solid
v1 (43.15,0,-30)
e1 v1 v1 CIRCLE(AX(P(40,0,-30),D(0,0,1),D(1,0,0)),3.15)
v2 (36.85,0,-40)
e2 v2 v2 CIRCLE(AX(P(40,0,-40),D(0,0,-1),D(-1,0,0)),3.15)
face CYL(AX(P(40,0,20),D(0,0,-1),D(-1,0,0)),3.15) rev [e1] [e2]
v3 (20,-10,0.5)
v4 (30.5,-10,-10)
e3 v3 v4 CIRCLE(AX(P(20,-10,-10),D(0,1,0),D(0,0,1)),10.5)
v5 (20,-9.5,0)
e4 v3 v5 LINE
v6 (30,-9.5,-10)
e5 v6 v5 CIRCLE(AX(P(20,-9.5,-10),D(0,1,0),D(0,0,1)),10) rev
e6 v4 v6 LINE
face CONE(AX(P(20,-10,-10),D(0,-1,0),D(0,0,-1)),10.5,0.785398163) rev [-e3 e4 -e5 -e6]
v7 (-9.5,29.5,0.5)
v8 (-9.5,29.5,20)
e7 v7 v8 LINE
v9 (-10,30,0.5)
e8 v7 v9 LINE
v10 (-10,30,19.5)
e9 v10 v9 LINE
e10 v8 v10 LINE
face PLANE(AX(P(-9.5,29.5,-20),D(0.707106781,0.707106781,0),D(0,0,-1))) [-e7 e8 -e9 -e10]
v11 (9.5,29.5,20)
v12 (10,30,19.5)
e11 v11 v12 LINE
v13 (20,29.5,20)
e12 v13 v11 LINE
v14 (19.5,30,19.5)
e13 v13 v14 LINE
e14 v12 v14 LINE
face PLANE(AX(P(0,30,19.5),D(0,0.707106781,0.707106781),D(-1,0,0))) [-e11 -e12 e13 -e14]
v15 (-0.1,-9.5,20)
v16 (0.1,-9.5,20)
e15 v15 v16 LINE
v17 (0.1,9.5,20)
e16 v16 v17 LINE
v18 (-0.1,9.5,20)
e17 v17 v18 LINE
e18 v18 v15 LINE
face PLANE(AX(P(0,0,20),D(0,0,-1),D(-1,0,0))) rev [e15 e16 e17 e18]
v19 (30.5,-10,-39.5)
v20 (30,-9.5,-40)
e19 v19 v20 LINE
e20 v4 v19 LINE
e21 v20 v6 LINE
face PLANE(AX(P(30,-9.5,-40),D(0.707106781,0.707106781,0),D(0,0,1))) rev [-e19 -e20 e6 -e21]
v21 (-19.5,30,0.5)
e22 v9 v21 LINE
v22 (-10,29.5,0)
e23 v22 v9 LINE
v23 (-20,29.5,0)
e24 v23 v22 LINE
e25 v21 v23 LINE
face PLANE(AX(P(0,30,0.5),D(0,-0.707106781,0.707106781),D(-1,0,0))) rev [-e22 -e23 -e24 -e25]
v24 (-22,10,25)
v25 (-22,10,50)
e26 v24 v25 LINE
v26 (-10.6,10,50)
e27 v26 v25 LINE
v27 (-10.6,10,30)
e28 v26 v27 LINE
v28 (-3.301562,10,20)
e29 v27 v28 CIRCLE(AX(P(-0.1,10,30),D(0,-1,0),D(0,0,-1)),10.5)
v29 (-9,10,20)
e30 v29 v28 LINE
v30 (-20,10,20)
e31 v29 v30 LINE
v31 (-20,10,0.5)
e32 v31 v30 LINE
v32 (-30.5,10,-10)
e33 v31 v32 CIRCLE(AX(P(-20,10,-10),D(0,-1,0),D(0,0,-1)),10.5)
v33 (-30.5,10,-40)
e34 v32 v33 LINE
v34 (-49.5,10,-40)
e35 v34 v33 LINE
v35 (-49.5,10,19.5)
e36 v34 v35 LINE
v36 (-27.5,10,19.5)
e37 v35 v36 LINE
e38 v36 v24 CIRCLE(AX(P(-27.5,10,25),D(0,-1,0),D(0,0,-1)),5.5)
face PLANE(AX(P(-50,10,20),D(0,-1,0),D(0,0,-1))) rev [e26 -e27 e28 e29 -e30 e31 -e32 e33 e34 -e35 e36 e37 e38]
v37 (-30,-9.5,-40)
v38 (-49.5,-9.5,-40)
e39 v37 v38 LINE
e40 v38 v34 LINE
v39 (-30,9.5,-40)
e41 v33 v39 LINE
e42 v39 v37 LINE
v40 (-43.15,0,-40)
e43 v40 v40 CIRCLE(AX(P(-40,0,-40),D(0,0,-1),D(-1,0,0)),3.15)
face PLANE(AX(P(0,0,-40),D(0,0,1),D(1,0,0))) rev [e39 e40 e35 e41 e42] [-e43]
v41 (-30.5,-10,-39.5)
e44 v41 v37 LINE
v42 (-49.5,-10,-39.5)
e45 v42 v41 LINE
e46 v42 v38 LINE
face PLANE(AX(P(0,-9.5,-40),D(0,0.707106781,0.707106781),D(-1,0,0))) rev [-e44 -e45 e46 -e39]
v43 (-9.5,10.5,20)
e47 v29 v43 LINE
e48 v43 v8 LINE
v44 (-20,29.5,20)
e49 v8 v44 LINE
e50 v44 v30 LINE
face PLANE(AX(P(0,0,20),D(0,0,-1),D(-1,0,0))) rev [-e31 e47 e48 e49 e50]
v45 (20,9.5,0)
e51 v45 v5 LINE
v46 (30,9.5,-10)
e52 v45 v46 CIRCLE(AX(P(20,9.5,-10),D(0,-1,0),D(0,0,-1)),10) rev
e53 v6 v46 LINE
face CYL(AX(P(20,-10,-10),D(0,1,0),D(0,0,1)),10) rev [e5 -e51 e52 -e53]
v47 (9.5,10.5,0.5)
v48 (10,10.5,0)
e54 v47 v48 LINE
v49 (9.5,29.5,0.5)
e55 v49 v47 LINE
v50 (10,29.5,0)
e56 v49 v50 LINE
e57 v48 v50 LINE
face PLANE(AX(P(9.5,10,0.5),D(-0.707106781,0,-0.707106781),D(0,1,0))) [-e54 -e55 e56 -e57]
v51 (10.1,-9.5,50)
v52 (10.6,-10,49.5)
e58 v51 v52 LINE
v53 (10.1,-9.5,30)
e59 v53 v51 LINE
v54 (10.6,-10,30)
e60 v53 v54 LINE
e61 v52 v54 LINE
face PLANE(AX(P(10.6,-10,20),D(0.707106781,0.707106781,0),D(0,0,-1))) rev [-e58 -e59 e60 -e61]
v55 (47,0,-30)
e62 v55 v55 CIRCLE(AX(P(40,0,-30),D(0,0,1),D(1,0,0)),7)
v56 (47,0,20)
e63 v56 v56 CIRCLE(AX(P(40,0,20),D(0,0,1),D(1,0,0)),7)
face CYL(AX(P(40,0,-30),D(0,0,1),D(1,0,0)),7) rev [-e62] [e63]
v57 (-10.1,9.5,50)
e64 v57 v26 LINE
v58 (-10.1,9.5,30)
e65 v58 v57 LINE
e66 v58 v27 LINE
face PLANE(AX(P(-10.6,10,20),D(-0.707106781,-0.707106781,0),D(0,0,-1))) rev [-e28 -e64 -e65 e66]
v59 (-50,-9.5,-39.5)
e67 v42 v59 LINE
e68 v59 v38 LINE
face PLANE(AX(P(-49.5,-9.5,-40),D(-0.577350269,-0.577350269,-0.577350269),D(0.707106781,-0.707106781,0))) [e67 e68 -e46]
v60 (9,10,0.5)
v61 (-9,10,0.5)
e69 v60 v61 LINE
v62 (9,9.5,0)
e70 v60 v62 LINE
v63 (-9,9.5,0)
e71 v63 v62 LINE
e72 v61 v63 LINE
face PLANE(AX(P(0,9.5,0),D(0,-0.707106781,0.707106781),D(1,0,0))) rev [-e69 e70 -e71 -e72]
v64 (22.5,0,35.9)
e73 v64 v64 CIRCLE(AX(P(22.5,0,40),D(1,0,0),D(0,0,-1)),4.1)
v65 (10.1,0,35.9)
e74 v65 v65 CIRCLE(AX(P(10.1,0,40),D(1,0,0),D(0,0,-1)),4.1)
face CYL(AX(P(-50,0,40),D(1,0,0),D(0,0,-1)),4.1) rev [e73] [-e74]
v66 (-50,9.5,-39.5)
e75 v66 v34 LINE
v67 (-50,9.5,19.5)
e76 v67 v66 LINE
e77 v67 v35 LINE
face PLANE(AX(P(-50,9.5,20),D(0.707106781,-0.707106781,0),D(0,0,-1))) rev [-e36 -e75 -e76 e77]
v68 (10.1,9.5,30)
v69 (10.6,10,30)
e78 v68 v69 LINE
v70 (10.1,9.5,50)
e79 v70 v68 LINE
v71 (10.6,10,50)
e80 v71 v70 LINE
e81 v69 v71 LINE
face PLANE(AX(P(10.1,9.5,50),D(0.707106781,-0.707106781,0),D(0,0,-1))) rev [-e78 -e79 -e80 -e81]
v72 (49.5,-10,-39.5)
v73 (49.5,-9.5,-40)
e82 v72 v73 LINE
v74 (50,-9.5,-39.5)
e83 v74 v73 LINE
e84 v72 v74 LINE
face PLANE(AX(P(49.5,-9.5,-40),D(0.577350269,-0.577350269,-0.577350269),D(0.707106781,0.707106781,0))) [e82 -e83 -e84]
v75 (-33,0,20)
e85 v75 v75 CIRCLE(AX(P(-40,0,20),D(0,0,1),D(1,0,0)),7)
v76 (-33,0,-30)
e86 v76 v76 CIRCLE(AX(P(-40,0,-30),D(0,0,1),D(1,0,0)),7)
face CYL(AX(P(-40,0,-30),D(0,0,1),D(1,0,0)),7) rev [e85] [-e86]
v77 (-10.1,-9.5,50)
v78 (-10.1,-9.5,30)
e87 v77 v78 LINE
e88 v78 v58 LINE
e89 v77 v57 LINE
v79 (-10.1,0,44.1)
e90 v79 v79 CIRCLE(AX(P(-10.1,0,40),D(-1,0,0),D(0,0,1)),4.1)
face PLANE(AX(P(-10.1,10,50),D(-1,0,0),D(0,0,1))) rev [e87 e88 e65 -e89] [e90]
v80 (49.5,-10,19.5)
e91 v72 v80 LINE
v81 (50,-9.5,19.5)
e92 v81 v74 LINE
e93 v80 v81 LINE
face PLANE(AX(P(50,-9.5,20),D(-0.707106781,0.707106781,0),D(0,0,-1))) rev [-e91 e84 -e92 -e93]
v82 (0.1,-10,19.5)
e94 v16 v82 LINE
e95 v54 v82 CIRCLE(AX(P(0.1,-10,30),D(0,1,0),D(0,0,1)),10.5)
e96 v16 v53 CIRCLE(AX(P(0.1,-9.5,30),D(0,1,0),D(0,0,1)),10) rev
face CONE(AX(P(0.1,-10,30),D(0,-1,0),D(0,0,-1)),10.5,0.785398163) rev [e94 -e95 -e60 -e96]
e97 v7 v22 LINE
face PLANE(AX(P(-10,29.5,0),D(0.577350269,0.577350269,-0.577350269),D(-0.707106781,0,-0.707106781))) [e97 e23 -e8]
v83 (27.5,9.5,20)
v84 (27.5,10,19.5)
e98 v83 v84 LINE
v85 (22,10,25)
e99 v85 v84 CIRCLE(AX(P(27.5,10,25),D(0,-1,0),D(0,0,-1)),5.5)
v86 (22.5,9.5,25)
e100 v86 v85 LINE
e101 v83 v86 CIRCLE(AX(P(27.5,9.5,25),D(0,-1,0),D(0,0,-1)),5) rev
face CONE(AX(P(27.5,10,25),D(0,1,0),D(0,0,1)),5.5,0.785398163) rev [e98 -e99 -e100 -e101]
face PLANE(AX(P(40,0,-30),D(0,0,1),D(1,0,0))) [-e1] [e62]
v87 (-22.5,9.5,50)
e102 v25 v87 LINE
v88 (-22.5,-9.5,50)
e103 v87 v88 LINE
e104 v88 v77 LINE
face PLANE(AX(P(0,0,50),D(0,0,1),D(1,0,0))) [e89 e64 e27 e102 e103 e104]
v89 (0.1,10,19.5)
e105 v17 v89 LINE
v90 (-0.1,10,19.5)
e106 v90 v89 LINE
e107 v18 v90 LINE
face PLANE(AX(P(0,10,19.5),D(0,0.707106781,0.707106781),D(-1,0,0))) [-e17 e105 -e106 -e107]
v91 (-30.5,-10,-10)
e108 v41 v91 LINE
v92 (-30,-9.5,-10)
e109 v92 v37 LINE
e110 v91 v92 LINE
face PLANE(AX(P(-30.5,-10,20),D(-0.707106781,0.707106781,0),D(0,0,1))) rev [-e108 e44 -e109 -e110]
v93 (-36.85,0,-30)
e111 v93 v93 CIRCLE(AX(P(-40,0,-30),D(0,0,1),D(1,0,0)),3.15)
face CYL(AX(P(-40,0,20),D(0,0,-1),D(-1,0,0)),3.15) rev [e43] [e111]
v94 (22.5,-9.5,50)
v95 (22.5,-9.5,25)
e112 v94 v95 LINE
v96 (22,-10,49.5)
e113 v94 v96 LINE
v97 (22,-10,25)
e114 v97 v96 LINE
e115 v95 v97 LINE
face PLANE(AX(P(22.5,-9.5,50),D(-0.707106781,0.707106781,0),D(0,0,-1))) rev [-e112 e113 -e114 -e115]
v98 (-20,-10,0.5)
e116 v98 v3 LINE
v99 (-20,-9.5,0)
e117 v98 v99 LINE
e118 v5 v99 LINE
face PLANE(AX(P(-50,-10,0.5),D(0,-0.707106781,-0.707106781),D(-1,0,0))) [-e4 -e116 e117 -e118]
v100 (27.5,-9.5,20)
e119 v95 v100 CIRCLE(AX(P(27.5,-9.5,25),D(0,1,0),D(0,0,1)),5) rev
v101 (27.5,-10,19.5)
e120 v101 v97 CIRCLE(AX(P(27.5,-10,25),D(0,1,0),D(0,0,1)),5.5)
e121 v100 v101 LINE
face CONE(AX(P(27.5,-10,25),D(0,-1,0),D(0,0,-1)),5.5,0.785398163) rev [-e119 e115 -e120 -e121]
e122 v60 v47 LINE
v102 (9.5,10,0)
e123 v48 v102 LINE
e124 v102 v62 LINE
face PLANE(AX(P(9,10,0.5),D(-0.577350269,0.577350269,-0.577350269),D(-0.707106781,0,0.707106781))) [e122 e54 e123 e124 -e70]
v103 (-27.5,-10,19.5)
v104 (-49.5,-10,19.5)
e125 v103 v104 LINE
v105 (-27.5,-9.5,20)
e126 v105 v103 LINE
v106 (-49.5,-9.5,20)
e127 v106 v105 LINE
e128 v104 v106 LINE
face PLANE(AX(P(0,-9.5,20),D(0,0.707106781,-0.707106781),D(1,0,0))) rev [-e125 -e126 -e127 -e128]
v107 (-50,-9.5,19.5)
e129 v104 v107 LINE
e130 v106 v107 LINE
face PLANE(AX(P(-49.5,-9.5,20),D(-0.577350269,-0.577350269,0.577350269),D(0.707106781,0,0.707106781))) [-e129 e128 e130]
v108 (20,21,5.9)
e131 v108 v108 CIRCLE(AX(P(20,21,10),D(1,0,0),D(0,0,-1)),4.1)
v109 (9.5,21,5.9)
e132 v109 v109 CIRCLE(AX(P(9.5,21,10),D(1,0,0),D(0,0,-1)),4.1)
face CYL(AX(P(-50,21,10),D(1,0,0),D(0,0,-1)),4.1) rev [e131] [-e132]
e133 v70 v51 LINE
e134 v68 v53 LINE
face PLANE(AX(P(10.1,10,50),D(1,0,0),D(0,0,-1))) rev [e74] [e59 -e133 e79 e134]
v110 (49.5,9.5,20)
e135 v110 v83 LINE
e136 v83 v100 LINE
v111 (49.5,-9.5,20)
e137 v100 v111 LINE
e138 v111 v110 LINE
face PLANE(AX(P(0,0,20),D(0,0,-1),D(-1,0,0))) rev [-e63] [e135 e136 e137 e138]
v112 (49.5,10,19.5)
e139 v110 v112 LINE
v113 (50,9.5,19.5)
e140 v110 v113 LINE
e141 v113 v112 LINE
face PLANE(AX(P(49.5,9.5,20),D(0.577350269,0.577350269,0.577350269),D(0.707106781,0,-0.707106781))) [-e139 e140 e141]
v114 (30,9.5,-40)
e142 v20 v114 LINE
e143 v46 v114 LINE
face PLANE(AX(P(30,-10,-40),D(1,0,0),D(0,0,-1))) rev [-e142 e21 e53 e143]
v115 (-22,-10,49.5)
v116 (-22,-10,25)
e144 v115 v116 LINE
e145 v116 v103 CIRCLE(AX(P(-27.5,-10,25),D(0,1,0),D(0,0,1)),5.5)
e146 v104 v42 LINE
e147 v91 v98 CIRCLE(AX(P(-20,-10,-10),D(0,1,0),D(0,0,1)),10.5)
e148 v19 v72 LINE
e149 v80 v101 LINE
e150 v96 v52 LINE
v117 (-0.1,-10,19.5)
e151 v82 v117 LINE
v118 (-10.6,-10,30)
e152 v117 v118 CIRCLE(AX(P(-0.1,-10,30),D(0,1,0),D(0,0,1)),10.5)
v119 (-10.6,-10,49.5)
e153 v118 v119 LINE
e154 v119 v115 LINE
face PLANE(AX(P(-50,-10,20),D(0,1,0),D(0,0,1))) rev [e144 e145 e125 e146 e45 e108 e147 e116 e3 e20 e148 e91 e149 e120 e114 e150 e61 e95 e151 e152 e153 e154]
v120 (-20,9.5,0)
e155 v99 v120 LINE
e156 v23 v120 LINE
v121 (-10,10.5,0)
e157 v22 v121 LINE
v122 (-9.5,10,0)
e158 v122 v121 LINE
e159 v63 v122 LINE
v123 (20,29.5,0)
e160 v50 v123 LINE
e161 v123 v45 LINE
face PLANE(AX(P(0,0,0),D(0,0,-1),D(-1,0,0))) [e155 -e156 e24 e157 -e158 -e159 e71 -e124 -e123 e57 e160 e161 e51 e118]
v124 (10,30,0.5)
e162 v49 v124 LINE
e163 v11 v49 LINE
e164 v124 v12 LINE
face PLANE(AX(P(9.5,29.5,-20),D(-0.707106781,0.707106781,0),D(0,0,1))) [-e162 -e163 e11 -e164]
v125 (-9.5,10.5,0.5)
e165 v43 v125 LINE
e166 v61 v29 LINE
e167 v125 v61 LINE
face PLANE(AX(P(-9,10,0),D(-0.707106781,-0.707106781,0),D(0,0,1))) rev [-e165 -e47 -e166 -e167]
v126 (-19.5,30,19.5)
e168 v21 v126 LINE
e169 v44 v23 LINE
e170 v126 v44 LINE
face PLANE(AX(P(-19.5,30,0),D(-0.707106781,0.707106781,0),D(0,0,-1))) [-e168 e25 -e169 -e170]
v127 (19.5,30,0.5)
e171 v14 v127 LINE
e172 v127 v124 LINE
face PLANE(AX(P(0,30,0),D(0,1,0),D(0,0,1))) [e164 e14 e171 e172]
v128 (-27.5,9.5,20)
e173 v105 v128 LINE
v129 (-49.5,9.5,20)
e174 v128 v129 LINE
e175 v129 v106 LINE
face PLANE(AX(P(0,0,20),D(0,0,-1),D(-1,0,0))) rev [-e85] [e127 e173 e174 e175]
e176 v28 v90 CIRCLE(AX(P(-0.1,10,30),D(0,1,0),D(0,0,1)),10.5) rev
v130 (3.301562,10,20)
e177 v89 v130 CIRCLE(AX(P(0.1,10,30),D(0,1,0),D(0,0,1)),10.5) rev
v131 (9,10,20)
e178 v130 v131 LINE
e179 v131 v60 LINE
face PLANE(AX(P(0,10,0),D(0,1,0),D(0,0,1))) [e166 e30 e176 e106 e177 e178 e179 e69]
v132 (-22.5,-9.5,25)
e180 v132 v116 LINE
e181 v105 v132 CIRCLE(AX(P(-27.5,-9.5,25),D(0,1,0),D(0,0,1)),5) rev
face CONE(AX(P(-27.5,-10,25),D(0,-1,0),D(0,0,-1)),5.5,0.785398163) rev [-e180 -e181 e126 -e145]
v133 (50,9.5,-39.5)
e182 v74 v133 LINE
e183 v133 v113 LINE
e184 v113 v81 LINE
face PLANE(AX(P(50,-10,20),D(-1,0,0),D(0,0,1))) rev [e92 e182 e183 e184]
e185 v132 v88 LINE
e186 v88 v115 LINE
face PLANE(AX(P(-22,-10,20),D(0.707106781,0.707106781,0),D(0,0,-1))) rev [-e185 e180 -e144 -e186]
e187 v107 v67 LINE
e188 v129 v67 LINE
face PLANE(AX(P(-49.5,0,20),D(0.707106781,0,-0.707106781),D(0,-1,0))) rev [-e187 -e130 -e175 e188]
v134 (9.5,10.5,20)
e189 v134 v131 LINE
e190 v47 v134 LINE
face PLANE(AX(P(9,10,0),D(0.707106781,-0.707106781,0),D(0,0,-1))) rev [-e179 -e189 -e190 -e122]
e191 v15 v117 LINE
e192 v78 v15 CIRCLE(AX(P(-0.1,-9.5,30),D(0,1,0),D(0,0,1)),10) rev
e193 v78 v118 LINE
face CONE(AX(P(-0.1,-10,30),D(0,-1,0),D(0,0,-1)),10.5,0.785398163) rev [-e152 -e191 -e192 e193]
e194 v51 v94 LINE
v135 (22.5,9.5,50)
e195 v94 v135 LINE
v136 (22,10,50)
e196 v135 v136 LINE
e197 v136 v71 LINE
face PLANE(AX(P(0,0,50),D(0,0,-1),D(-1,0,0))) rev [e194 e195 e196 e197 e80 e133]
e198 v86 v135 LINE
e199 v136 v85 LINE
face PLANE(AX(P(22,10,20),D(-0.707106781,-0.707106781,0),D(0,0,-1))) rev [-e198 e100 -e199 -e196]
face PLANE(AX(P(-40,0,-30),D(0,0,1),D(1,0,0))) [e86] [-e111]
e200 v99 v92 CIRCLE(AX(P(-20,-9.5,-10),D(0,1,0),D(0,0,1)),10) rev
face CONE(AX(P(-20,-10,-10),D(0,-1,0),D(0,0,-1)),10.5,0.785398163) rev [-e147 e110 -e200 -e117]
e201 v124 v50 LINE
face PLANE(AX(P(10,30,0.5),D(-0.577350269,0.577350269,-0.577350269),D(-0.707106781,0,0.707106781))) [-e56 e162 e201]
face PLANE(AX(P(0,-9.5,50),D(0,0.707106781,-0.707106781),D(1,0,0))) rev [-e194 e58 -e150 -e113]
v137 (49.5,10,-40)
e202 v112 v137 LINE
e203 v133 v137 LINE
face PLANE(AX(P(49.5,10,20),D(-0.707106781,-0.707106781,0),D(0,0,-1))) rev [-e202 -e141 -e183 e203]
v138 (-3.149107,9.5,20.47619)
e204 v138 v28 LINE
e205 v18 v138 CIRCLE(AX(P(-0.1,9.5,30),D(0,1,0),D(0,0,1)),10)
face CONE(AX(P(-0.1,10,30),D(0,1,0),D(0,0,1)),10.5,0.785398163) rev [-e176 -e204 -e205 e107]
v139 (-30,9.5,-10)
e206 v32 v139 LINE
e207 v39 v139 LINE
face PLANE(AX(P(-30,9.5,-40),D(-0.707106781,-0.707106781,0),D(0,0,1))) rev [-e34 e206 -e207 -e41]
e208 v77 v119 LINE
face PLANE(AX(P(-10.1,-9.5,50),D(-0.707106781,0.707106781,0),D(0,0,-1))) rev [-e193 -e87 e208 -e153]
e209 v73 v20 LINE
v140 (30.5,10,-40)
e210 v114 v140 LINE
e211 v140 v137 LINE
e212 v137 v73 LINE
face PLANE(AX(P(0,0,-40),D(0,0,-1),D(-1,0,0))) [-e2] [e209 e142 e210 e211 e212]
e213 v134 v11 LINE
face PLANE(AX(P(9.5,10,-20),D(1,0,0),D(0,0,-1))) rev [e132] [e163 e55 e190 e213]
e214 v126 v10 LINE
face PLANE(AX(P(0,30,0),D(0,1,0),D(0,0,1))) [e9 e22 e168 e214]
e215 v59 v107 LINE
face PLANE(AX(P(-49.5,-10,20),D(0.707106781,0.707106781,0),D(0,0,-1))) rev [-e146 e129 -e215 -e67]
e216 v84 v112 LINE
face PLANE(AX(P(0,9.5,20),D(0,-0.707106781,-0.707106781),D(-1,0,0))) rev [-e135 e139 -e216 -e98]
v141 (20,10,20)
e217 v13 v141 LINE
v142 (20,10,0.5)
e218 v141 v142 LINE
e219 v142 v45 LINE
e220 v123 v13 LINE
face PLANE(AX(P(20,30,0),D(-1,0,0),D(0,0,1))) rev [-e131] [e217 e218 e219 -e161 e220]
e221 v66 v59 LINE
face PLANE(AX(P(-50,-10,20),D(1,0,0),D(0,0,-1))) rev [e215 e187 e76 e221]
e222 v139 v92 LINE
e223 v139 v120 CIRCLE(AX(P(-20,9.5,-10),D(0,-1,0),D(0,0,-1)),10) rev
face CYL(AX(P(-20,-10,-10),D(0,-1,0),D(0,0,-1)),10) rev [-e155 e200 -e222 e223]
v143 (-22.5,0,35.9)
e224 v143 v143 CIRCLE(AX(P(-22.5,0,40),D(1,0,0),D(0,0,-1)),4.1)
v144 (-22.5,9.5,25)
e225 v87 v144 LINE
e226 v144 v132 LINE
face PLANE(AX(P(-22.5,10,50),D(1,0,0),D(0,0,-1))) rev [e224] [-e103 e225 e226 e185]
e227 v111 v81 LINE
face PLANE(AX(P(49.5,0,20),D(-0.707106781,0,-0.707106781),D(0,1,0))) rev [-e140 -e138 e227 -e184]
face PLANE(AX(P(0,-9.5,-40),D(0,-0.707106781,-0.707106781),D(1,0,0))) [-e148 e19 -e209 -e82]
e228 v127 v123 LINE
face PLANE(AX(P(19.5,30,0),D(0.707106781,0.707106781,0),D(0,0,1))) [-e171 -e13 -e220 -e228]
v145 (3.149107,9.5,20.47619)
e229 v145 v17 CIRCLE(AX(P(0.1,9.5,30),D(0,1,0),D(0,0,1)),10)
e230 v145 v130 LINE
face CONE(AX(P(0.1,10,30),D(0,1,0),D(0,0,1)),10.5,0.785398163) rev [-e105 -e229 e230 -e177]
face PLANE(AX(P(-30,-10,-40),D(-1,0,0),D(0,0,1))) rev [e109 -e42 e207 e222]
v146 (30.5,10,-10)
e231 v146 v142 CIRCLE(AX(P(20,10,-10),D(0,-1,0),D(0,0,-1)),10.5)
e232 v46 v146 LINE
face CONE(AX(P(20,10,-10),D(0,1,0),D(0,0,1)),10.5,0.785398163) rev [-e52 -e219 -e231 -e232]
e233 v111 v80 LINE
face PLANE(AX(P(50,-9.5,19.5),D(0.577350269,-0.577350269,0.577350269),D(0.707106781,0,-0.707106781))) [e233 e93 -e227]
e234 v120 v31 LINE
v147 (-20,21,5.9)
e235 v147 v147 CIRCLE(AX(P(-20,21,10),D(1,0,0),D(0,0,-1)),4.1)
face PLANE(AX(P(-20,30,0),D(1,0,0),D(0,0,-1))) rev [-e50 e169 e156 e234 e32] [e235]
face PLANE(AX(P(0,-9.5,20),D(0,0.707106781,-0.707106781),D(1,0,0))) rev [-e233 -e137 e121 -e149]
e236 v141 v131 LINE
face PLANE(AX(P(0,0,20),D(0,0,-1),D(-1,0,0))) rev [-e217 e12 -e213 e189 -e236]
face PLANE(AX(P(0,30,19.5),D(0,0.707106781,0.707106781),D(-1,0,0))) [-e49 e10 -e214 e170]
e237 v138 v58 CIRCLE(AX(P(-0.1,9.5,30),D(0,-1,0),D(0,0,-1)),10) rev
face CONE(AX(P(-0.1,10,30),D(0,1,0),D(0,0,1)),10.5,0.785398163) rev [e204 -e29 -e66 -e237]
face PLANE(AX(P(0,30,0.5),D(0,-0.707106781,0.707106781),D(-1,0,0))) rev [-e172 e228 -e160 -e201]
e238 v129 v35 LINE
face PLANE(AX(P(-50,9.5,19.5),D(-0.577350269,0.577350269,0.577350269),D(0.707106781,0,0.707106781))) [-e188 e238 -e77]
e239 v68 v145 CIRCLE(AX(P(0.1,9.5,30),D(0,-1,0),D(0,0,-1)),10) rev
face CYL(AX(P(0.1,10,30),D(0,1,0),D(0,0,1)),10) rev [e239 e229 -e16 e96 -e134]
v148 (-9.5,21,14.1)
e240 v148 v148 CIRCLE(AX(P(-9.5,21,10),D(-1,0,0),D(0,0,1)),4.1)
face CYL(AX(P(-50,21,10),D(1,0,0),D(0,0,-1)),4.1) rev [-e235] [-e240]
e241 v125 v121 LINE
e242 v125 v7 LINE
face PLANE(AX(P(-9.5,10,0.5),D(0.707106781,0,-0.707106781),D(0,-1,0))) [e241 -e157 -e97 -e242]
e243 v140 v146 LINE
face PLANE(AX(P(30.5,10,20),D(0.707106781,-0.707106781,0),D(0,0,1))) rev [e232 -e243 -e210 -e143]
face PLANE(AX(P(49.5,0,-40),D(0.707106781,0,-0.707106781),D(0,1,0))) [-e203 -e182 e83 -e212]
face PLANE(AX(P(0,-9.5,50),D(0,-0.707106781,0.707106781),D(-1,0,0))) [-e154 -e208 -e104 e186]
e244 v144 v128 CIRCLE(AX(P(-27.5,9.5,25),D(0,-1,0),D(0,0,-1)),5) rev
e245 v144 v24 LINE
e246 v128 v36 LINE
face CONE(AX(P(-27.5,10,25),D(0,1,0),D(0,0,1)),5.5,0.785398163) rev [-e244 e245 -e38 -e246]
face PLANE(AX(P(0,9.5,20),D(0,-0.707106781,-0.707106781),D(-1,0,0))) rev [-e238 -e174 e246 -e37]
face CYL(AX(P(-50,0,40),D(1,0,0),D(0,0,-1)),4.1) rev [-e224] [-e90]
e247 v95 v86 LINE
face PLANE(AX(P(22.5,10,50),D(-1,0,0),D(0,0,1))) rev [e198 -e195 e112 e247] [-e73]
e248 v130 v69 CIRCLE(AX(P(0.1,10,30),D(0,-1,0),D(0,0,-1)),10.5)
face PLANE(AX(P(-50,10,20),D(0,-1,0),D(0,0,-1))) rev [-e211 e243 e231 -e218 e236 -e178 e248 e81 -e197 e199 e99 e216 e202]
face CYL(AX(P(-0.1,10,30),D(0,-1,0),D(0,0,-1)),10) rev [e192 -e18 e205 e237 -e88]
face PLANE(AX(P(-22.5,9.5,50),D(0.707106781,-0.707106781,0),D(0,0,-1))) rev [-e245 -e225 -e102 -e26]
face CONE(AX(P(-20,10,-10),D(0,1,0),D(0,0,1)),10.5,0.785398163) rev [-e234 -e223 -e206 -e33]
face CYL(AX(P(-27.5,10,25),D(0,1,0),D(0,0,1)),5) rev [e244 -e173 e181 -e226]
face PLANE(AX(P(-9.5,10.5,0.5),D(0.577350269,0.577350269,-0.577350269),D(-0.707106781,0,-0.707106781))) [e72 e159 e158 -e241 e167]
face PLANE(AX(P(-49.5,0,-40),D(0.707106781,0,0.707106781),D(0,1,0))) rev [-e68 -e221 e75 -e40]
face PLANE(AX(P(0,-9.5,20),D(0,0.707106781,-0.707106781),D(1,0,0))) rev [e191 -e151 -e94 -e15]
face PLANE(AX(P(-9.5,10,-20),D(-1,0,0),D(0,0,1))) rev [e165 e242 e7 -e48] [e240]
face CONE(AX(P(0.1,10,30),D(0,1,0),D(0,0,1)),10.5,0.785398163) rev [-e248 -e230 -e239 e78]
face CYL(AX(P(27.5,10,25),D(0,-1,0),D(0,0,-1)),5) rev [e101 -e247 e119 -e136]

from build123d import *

# Parameters (mm, degrees)
SKETCH1_W           = 100
SKETCH1_H           = 20
SKETCH1_R           = 3.15
BOSS_EXTRUDE1_DEPTH = 20
SKETCH8_W           = 40
SKETCH8_H           = 20
BOSS_EXTRUDE2_DEPTH = 20
SKETCH9_W           = 19
SKETCH9_H           = 40
CUT_EXTRUDE5_DEPTH  = 20
SKETCH10_R          = 4.1
CUT_EXTRUDE6_DEPTH  = 79.74007874
SKETCH11_W          = 12.4
SKETCH11_H          = 20
BOSS_EXTRUDE3_DEPTH = 30
FILLET1_R           = 10
FILLET2_R           = 5
SKETCH12_R          = 4.1
CUT_EXTRUDE7_DEPTH  = 94.03897033
BOSS_EXTRUDE4_START = 40
SKETCH13_W          = 20
SKETCH13_H          = 20
SKETCH13_R          = 3.15
BOSS_EXTRUDE4_DEPTH = 40
FILLET3_R           = 10
CHAMFER1_SIZE       = 0.5
SKETCH5_R           = 7
CUT_EXTRUDE3_DEPTH  = 50


with BuildPart() as part:
    # Sketch1 → Boss-Extrude1 (new body)
    with BuildSketch(Plane.XY):
        Rectangle(SKETCH1_W, SKETCH1_H)
        with Locations((-40, 0)):
            Circle(SKETCH1_R, mode=Mode.SUBTRACT)
        with Locations((40, 0)):
            Circle(SKETCH1_R, mode=Mode.SUBTRACT)
    extrude(amount=BOSS_EXTRUDE1_DEPTH)

    # Sketch8 → Boss-Extrude2 (add)
    with BuildSketch(Plane(origin=(0, 10, 0), x_dir=(1, 0, 0), z_dir=(0, 1, 0))):
        with Locations((0, -10)):
            Rectangle(SKETCH8_W, SKETCH8_H)
    extrude(amount=BOSS_EXTRUDE2_DEPTH)

    # Sketch9 → Cut-Extrude5 (cut)
    with BuildSketch(Plane(origin=(0, 30, 0), x_dir=(1, 0, 0), z_dir=(0, 1, 0))):
        Rectangle(SKETCH9_W, SKETCH9_H)
    extrude(amount=-CUT_EXTRUDE5_DEPTH, mode=Mode.SUBTRACT)

    # Sketch10 → Cut-Extrude6 (cut, through all)
    with BuildSketch(Plane(origin=(20, 0, 0), x_dir=(0, 0, -1), z_dir=(1, 0, 0))):
        with Locations((-10, 21)):
            Circle(SKETCH10_R)
    extrude(amount=-CUT_EXTRUDE6_DEPTH, mode=Mode.SUBTRACT)

    # Sketch11 → Boss-Extrude3 (add)
    with BuildSketch(Plane.XY.offset(20)):
        with Locations((-16.3, 0)):
            Rectangle(SKETCH11_W, SKETCH11_H)
        with Locations((16.3, 0)):
            Rectangle(SKETCH11_W, SKETCH11_H)
    extrude(amount=BOSS_EXTRUDE3_DEPTH)

    # Fillet1
    # the kernel refuses this fillet: 10 mm, written as the material it adds along each edge
    with BuildSketch(Plane(origin=(-10.1, 10, 20), x_dir=(1, 0, 0), z_dir=(0, -1, 0))) as fillet1_piece_1:
        with BuildLine():
            CenterArc((FILLET1_R, FILLET1_R), FILLET1_R, 180, 90)
            Line((0, FILLET1_R), (0, 0))
            Line((0, 0), (FILLET1_R, 0))
        make_face()
    extrude(amount=20)
    with BuildSketch(Plane(origin=(10.1, 10, 20), x_dir=(-1, 0, 0), z_dir=(0, -1, 0))) as fillet1_piece_2:
        with BuildLine():
            CenterArc((FILLET1_R, -FILLET1_R), FILLET1_R, 90, 90)
            Line((0, -FILLET1_R), (0, 0))
            Line((0, 0), (FILLET1_R, 0))
        make_face()
    extrude(amount=20)

    # Fillet2
    fillet2_edges = [part.edges().sort_by_distance(p)[0] for p in [
        (-22.5, 0, 20),
        (22.5, 0, 20),
    ]]
    fillet(fillet2_edges, radius=FILLET2_R)

    # Sketch12 → Cut-Extrude7 (cut, through all)
    with BuildSketch(Plane(origin=(22.5, 0, 0), x_dir=(0, 0, -1), z_dir=(1, 0, 0))):
        with Locations((-40, 0)):
            Circle(SKETCH12_R)
    extrude(amount=-CUT_EXTRUDE7_DEPTH, mode=Mode.SUBTRACT)

    # Sketch13 → Boss-Extrude4 (add)
    # profile 1 of 2: a face of its own
    with BuildSketch(Plane(origin=(0, 0, 0), x_dir=(-1, 0, 0), z_dir=(0, 0, -1)).offset(BOSS_EXTRUDE4_START)):
        with Locations((-40, 0)):
            Rectangle(SKETCH13_W, SKETCH13_H)
        with Locations((-40, 0)):
            Circle(SKETCH13_R, mode=Mode.SUBTRACT)
    # profile 2 of 2: a face of its own
    with BuildSketch(Plane(origin=(0, 0, 0), x_dir=(-1, 0, 0), z_dir=(0, 0, -1)).offset(BOSS_EXTRUDE4_START)):
        with Locations((40, 0)):
            Rectangle(SKETCH13_W, SKETCH13_H)
        with Locations((40, 0)):
            Circle(SKETCH13_R, mode=Mode.SUBTRACT)
    extrude(amount=-BOSS_EXTRUDE4_DEPTH)

    # Fillet3
    fillet3_edges = [part.edges().sort_by_distance(p)[0] for p in [
        (-30, 0, 0),
        (30, 0, 0),
    ]]
    fillet(fillet3_edges, radius=FILLET3_R)

    # Chamfer1
    chamfer1_edges = [part.edges().sort_by_distance(p)[0] for p in [
        (-7.171067812, -10, 22.928932188),
        (-50, 0, 20),
        (-38.75, 10, 20),
        (38.75, -10, 20),
        (-23.964466094, -10, 21.464466094),
        (-23.964466094, 10, 21.464466094),
        (23.964466094, 10, 21.464466094),
        (23.964466094, -10, 21.464466094),
        (50, 0, -40),
        (40, -10, -40),
        (30, -10, -25),
        (30, 10, -25),
        (-50, 0, -40),
        (-40, -10, -40),
        (-38.75, -10, 20),
        (-30, 10, -25),
        (-30, -10, -25),
        (0, -10, 0),
        (-27.071067812, -10, -2.928932188),
        (-27.071067812, 10, -2.928932188),
        (27.071067812, 10, -2.928932188),
        (27.071067812, -10, -2.928932188),
        (-20, 30, 10),
        (-14.75, 30, 20),
        (20, 30, 10),
        (14.75, 30, 0),
        (14.75, 30, 20),
        (-14.75, 30, 0),
        (-9.5, 30, 10),
        (0, 10, 0),
        (9.5, 20, 0),
        (-9.5, 20, 0),
        (9.5, 10, 10),
        (-9.5, 10, 10),
        (9.5, 30, 10),
        (50, 0, 20),
        (-22.5, 10, 37.5),
        (-22.5, -10, 37.5),
        (-10.1, -10, 40),
        (-10.1, 10, 40),
        (-16.3, -10, 50),
        (50, -10, -10),
        (-50, -10, -10),
        (22.5, -10, 37.5),
        (-50, 10, -10),
        (22.5, 10, 37.5),
        (10.1, 10, 40),
        (50, 10, -10),
        (10.1, -10, 40),
        (16.3, -10, 50),
        (38.75, 10, 20),
        (0, 10, 20),
        (0, -10, 20),
        (7.171067812, -10, 22.928932188),
        (7.171067812, 10, 22.928932188),
        (-7.171067812, 10, 22.928932188),
    ]]
    chamfer(chamfer1_edges, length=CHAMFER1_SIZE)

    # Sketch5 → Cut-Extrude3 (cut)
    with BuildSketch(Plane.XY.offset(20)):
        with Locations((-40, 0)):
            Circle(SKETCH5_R)
        with Locations((40, 0)):
            Circle(SKETCH5_R)
    extrude(amount=-CUT_EXTRUDE3_DEPTH, mode=Mode.SUBTRACT)


solid = part.part
